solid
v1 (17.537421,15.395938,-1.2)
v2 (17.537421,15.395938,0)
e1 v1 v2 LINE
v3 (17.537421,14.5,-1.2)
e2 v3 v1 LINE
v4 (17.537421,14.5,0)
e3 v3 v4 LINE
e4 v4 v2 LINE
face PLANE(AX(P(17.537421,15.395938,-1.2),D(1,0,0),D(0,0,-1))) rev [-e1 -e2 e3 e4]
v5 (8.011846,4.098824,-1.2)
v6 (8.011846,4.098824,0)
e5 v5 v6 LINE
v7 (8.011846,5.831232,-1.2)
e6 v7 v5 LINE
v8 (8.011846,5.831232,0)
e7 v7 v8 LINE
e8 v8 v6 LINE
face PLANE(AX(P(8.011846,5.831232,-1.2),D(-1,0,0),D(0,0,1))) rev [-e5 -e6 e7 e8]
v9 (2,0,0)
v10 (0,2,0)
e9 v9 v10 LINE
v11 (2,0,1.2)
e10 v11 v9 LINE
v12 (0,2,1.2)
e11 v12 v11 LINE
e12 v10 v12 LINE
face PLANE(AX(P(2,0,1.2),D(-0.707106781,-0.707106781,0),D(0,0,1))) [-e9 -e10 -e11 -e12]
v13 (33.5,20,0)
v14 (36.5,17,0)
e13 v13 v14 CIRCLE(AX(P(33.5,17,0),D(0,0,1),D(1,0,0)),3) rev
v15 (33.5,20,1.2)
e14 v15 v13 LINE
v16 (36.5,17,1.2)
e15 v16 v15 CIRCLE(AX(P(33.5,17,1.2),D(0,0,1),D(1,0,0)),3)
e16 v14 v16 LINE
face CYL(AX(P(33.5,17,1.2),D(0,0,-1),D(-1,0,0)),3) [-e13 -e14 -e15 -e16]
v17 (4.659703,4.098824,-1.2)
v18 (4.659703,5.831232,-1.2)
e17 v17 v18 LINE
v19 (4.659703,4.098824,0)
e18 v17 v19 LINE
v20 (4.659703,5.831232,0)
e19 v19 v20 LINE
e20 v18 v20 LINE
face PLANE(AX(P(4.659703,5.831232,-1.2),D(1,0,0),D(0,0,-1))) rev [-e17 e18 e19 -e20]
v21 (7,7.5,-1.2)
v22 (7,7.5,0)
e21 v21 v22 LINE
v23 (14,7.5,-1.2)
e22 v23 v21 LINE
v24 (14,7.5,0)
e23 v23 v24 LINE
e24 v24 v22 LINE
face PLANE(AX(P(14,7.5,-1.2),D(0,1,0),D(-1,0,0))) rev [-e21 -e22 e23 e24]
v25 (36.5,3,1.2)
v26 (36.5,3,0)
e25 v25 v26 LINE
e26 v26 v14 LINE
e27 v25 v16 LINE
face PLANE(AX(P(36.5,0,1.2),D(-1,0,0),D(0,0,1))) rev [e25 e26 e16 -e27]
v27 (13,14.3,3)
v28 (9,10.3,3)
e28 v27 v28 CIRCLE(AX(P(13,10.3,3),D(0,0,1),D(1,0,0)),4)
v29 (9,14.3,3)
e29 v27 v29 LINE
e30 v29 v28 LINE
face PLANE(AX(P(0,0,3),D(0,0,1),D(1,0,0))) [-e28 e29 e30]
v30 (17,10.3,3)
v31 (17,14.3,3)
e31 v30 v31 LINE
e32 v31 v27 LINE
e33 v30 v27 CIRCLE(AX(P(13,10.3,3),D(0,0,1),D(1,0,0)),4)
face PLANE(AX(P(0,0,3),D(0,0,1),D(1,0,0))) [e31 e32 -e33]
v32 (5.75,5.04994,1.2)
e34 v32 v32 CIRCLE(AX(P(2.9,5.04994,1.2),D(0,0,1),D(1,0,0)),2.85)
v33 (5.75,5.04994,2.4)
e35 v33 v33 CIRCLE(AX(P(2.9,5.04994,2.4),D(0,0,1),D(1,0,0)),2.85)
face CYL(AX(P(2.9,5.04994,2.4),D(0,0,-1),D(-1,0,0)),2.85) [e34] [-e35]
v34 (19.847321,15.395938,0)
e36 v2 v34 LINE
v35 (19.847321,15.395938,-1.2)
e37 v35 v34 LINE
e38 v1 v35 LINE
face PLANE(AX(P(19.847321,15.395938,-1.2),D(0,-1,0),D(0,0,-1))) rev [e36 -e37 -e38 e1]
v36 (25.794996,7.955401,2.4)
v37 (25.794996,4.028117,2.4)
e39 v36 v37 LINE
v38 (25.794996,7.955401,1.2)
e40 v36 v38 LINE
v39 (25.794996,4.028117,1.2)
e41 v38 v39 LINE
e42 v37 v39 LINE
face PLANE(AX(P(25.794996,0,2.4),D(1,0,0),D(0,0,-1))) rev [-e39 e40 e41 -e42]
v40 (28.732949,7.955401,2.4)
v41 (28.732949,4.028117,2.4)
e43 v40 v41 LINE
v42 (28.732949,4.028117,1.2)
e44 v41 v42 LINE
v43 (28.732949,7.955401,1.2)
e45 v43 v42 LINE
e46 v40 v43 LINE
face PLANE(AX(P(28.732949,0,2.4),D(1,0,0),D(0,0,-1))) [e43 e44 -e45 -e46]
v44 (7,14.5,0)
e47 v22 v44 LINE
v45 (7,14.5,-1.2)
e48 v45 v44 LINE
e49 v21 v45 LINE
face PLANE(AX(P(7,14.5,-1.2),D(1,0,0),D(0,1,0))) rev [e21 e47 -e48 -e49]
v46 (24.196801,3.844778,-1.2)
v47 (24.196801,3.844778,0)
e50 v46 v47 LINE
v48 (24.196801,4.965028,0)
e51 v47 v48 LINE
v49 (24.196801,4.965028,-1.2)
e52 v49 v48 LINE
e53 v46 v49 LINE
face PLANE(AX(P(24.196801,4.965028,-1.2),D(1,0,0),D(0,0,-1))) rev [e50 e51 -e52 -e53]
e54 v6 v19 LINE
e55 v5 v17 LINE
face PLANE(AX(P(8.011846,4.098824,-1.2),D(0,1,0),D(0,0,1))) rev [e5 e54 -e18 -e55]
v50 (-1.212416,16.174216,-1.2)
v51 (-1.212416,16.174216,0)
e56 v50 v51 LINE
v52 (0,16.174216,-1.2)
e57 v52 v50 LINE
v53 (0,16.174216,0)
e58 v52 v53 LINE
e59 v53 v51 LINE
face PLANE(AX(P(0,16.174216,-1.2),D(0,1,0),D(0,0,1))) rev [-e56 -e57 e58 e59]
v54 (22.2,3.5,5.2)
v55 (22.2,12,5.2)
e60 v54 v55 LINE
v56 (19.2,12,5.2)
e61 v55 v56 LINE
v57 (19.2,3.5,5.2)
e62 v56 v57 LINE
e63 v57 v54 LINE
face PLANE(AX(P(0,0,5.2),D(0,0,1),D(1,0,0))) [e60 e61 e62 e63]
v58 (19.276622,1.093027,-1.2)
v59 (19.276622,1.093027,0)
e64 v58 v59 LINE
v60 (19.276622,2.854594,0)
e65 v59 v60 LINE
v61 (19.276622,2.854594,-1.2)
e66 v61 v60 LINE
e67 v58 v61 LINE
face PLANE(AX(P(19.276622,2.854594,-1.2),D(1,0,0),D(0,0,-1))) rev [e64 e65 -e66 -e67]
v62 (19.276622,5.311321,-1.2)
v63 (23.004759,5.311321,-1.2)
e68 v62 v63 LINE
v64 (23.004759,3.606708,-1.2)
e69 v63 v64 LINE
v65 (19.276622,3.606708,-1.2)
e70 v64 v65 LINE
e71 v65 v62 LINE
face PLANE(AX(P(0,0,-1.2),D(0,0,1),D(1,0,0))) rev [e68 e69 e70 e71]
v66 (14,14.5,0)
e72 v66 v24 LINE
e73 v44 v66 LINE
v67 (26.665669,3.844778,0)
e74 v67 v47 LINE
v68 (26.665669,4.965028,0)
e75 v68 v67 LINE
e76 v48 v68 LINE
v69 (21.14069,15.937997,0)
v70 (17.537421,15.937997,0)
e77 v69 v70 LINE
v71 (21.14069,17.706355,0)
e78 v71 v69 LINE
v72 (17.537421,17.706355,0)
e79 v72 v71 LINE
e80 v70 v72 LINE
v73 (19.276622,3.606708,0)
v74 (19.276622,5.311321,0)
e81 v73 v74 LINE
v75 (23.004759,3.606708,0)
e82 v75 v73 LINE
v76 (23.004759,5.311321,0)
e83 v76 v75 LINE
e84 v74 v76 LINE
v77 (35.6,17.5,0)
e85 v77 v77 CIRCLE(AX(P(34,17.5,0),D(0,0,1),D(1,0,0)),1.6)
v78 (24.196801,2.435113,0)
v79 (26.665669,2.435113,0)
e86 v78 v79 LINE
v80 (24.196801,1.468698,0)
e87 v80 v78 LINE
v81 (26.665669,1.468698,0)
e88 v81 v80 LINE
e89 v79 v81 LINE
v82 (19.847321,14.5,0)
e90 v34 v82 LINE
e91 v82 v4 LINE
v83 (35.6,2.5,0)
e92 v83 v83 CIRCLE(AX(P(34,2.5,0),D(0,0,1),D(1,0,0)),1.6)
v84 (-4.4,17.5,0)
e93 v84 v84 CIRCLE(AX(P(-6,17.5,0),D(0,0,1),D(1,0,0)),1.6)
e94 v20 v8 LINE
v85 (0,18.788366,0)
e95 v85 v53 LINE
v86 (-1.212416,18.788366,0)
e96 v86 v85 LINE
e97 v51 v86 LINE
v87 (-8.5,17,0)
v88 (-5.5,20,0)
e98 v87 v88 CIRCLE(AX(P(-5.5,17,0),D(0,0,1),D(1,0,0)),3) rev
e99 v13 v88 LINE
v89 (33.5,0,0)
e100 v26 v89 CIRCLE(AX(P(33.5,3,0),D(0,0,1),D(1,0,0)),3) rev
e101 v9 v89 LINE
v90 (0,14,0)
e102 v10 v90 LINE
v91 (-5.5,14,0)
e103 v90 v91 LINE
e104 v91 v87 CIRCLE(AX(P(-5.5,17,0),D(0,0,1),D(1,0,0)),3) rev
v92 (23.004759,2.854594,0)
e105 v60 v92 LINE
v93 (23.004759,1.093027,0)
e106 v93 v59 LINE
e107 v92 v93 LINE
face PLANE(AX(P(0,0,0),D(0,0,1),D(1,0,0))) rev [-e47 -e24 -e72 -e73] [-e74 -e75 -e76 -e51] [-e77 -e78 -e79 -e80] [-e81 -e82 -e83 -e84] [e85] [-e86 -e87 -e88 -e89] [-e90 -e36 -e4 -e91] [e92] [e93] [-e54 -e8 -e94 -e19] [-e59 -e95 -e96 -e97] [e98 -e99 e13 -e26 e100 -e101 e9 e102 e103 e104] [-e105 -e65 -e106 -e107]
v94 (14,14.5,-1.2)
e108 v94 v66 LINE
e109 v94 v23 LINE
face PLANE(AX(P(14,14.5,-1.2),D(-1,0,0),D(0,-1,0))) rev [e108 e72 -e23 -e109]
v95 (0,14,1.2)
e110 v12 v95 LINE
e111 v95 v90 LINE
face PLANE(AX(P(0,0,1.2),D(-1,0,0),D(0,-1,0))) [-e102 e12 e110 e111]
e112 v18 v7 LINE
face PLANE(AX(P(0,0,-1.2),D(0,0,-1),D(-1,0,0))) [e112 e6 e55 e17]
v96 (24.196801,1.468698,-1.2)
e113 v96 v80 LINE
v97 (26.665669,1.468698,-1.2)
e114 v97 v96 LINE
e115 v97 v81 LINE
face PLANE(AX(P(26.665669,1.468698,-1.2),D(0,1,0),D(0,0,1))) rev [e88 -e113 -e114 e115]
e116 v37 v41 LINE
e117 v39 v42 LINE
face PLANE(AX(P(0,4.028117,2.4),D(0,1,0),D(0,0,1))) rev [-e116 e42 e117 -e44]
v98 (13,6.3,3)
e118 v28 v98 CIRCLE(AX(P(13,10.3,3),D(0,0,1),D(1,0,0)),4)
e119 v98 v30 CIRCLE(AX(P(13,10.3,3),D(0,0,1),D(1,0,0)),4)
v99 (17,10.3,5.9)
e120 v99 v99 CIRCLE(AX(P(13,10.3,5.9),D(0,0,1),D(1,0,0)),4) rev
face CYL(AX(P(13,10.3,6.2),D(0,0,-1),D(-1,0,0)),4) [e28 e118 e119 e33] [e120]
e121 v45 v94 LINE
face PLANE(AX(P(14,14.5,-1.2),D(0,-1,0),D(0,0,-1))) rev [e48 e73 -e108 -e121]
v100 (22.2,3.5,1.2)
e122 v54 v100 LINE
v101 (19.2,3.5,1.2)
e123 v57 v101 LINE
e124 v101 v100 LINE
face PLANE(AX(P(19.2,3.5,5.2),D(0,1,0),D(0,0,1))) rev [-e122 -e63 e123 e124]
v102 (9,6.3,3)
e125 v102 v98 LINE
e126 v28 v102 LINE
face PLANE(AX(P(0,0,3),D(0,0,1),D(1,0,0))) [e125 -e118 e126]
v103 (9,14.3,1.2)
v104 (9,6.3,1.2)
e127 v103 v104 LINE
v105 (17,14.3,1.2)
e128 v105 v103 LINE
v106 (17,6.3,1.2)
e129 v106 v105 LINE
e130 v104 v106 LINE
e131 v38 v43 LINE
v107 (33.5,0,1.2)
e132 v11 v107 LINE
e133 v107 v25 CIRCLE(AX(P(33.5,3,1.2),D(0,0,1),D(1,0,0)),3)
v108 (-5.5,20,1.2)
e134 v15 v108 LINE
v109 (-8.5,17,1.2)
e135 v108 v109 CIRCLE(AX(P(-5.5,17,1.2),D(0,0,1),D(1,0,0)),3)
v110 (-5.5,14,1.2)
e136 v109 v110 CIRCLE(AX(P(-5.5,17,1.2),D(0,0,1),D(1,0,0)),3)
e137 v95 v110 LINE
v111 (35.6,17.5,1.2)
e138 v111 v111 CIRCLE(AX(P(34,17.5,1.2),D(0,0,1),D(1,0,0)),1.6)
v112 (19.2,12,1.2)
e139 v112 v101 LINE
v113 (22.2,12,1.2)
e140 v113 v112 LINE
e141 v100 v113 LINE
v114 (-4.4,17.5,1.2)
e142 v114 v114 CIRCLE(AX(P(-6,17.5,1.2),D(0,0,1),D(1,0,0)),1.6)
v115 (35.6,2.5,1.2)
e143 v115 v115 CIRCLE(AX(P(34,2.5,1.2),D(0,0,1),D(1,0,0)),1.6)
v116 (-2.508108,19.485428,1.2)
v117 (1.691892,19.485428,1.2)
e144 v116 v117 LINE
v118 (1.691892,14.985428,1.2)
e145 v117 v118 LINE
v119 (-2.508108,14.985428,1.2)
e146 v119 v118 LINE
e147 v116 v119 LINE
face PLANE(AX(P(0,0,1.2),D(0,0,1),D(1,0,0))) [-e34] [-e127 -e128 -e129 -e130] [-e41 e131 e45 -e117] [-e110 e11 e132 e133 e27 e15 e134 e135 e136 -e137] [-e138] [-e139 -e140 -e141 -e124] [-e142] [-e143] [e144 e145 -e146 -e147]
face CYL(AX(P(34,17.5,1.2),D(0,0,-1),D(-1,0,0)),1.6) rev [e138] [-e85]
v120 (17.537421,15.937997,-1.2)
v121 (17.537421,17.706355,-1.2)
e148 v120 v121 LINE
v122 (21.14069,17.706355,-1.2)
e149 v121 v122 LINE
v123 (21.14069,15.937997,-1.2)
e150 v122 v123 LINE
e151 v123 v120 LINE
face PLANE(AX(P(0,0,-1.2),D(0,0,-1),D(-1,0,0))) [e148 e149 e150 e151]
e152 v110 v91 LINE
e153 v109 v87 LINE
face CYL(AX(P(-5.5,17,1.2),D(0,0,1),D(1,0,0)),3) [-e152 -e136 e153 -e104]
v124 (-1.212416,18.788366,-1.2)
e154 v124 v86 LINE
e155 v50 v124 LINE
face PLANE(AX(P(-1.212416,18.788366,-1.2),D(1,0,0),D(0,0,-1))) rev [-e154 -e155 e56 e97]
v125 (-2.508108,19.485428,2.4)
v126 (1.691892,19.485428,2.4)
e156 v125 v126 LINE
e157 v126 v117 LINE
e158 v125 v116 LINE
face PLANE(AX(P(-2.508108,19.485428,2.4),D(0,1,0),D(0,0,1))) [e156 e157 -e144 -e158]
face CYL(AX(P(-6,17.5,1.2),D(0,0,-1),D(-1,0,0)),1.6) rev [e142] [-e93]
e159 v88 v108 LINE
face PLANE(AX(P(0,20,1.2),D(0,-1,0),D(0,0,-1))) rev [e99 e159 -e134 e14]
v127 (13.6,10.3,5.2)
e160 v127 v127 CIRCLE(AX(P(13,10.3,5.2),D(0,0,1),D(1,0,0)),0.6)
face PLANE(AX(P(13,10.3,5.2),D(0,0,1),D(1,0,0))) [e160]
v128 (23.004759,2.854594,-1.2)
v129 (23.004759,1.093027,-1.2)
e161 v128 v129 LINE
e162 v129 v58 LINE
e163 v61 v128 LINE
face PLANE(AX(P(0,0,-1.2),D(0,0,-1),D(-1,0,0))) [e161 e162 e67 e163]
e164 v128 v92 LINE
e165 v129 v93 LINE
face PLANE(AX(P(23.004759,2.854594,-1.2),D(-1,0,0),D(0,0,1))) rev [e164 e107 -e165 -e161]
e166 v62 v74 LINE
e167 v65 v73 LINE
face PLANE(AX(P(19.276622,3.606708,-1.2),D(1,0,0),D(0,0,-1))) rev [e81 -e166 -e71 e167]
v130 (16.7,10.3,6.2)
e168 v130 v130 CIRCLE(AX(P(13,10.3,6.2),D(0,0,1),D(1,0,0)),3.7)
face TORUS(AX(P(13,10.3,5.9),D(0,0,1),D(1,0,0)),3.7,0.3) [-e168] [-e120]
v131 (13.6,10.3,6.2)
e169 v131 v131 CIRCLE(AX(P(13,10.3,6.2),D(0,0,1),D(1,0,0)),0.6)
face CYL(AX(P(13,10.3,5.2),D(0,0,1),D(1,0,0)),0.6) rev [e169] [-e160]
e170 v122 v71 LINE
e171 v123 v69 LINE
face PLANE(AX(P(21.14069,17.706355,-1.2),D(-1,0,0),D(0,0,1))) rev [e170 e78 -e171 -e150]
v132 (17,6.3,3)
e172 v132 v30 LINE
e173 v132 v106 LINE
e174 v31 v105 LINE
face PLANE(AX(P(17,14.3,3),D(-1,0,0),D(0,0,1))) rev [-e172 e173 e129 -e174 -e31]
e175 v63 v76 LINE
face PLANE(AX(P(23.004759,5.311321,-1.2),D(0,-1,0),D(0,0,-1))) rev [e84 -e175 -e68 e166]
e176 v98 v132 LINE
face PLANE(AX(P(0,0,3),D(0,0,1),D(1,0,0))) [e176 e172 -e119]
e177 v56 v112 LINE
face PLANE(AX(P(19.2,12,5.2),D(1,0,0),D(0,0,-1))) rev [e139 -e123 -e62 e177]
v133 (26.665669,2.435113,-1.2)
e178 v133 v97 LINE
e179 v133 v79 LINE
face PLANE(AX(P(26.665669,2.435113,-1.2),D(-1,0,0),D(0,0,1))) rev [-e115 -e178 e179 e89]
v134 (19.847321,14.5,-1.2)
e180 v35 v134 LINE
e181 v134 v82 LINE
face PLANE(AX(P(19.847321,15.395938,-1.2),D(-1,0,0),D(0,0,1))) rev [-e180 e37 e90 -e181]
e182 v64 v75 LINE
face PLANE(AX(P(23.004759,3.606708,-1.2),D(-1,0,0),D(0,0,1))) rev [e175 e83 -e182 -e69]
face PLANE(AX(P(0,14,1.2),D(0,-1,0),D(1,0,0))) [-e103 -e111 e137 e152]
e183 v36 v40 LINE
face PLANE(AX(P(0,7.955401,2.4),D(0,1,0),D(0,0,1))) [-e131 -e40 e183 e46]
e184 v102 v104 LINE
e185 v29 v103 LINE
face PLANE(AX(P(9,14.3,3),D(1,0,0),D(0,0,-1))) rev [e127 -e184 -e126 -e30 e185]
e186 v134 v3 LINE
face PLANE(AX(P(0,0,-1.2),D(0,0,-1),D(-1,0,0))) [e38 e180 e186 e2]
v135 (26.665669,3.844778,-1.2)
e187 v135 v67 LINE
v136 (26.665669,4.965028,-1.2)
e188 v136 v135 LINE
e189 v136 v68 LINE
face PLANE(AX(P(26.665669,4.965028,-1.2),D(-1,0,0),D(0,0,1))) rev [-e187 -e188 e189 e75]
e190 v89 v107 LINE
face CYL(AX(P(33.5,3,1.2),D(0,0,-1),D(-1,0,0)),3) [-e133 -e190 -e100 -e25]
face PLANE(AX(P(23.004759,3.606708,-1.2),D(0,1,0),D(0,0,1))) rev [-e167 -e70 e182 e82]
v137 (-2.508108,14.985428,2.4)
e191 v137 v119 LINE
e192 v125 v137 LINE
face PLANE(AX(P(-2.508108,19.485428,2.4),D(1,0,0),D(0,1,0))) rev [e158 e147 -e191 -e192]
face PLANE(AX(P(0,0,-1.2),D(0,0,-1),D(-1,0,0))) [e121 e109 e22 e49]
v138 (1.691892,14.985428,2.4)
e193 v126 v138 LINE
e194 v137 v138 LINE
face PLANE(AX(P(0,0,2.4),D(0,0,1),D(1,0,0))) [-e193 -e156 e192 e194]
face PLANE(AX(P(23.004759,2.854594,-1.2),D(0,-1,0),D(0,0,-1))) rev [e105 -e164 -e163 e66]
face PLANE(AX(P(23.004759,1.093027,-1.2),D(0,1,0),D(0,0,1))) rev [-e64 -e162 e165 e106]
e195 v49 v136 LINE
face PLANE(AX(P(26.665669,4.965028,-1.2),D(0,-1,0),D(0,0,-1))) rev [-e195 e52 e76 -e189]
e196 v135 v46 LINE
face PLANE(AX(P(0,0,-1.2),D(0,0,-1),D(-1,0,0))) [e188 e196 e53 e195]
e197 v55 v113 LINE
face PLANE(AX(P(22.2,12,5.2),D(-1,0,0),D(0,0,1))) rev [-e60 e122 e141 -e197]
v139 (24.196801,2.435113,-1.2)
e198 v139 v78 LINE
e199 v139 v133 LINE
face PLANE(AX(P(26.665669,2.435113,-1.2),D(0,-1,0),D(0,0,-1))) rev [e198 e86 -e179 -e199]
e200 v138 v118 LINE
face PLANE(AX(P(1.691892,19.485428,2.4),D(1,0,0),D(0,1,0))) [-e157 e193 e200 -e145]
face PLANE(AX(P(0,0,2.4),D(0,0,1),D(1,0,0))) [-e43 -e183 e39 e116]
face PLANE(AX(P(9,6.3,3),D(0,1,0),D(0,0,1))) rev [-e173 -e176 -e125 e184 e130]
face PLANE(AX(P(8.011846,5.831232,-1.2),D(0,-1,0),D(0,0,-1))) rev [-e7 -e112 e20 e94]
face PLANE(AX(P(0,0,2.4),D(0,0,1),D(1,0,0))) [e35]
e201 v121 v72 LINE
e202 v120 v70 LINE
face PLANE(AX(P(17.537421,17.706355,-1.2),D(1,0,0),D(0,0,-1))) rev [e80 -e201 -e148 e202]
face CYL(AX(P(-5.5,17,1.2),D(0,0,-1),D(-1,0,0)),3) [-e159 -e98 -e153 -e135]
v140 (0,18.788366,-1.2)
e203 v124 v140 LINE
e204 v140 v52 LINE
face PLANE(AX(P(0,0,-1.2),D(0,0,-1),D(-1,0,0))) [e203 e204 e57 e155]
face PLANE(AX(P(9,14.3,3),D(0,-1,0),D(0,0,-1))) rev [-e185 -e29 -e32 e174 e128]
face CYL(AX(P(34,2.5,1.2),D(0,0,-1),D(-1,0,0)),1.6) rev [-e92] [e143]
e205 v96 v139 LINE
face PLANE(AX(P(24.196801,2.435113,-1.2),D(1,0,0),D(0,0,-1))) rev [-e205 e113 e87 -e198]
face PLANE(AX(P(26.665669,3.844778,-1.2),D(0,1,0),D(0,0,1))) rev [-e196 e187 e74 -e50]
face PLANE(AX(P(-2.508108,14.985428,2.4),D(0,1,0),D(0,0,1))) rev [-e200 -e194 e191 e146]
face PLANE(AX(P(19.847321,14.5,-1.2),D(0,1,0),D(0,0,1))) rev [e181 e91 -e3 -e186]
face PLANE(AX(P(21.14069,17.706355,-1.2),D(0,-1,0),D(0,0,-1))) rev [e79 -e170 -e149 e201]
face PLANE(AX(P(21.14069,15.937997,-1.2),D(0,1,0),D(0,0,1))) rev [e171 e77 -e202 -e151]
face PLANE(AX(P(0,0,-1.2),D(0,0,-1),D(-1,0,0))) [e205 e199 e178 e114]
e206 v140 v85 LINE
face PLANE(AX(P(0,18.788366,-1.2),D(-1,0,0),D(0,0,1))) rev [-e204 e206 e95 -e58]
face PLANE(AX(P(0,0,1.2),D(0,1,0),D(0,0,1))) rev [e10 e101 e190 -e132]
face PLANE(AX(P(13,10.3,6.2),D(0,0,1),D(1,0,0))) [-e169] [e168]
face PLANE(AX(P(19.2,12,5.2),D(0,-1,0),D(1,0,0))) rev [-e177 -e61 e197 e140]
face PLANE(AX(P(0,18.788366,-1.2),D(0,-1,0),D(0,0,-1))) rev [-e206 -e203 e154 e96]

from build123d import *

# Parameters (mm, degrees)
SKETCH1_R           = 1.6
BOSS_EXTRUDE1_DEPTH = 1.2
SKETCH2_R           = 2.85
SKETCH2_W           = 2.937952631
SKETCH2_H           = 3.927283648
SKETCH2_W_2         = 4.2
SKETCH2_H_2         = 4.5
BOSS_EXTRUDE2_DEPTH = 1.2
SKETCH3_W           = 8
SKETCH3_H           = 8
BOSS_EXTRUDE3_DEPTH = 1.8
SKETCH4_R           = 4
BOSS_EXTRUDE4_DEPTH = 3.2
SKETCH5_R           = 0.6
CUT_EXTRUDE1_DEPTH  = 1
SKETCH7_W           = 7
SKETCH7_H           = 7
SKETCH7_W_2         = 3.728136851
SKETCH7_H_2         = 1.761566417
SKETCH7_H_3         = 1.704612402
SKETCH7_W_3         = 3.603269321
SKETCH7_H_4         = 1.768357774
SKETCH7_W_4         = 3.352143609
SKETCH7_H_5         = 1.732407439
SKETCH7_W_5         = 1.212415991
SKETCH7_H_6         = 2.614149225
SKETCH7_W_6         = 2.309899449
SKETCH7_H_7         = 0.895937988
SKETCH7_W_7         = 2.468868555
SKETCH7_H_8         = 1.120250043
SKETCH7_H_9         = 0.966414447
BOSS_EXTRUDE5_DEPTH = 1.2
SKETCH8_W           = 3
SKETCH8_H           = 8.5
BOSS_EXTRUDE6_DEPTH = 4
FILLET1_R           = 0.3
FILLET2_R           = 3
CHAMFER1_SIZE       = 2


with BuildPart() as part:
    # Sketch1 → Boss-Extrude1 (new body)
    with BuildSketch(Plane.XY):
        Polygon((0, 20), (-8.5, 20), (-8.5, 14), (0, 14), (0, 0), (36.5, 0), (36.5, 20), align=None)
        with Locations((-6, 17.5)):
            Circle(SKETCH1_R, mode=Mode.SUBTRACT)
        with Locations((34, 2.5)):
            Circle(SKETCH1_R, mode=Mode.SUBTRACT)
        with Locations((34, 17.5)):
            Circle(SKETCH1_R, mode=Mode.SUBTRACT)
    extrude(amount=BOSS_EXTRUDE1_DEPTH)

    # Sketch2 → Boss-Extrude2 (add)
    with BuildSketch(Plane.XY.offset(1.2)):
        with Locations((2.9, 5.049940133)):
            Circle(SKETCH2_R)
        with Locations((27.263972555, 5.991759132)):
            Rectangle(SKETCH2_W, SKETCH2_H)
        with Locations((-0.408107806, 17.235427956)):
            Rectangle(SKETCH2_W_2, SKETCH2_H_2)
    extrude(amount=BOSS_EXTRUDE2_DEPTH)

    # Sketch3 → Boss-Extrude3 (add)
    with BuildSketch(Plane.XY.offset(1.2)):
        with Locations((13, 10.3)):
            Rectangle(SKETCH3_W, SKETCH3_H)
    extrude(amount=BOSS_EXTRUDE3_DEPTH)

    # Sketch4 → Boss-Extrude4 (add)
    with BuildSketch(Plane.XY.offset(3)):
        with Locations((13, 10.3)):
            Circle(SKETCH4_R)
    extrude(amount=BOSS_EXTRUDE4_DEPTH)

    # Sketch5 → Cut-Extrude1 (cut)
    with BuildSketch(Plane.XY.offset(6.2)):
        with Locations((13, 10.3)):
            Circle(SKETCH5_R)
    extrude(amount=-CUT_EXTRUDE1_DEPTH, mode=Mode.SUBTRACT)

    # Sketch7 → Boss-Extrude5 (add)
    with BuildSketch(Plane(origin=(0, 0, 0), x_dir=(-1, 0, 0), z_dir=(0, 0, -1))):
        with Locations((-10.5, 11)):
            Rectangle(SKETCH7_W, SKETCH7_H)
        with Locations((-21.140690462, 1.973810546)):
            Rectangle(SKETCH7_W_2, SKETCH7_H_2)
        with Locations((-21.140690462, 4.459014526)):
            Rectangle(SKETCH7_W_2, SKETCH7_H_3)
        with Locations((-19.339055802, 16.82217617)):
            Rectangle(SKETCH7_W_3, SKETCH7_H_4)
        with Locations((-6.335774559, 4.965027996)):
            Rectangle(SKETCH7_W_4, SKETCH7_H_5)
        with Locations((0.606207996, 17.481290904)):
            Rectangle(SKETCH7_W_5, SKETCH7_H_6)
        with Locations((-18.692370866, 14.947968994)):
            Rectangle(SKETCH7_W_6, SKETCH7_H_7)
        with Locations((-25.431234808, 4.404902976)):
            Rectangle(SKETCH7_W_7, SKETCH7_H_8)
        with Locations((-25.431234808, 1.951905582)):
            Rectangle(SKETCH7_W_7, SKETCH7_H_9)
    extrude(amount=BOSS_EXTRUDE5_DEPTH)

    # Sketch8 → Boss-Extrude6 (add)
    with BuildSketch(Plane.XY.offset(1.2)):
        with Locations((20.7, 7.75)):
            Rectangle(SKETCH8_W, SKETCH8_H)
    extrude(amount=BOSS_EXTRUDE6_DEPTH)

    # Fillet1
    fillet1_edges = [part.edges().sort_by_distance(p)[0] for p in [
        (9, 10.3, 6.2),
    ]]
    fillet(fillet1_edges, radius=FILLET1_R)

    # Fillet2
    fillet2_edges = [part.edges().sort_by_distance(p)[0] for p in [
        (36.5, 20, 0.6),
        (36.5, 0, 0.6),
        (-8.5, 14, 0.6),
        (-8.5, 20, 0.6),
    ]]
    fillet(fillet2_edges, radius=FILLET2_R - 0.0001)  # a hair under: the kernel refuses the full size

    # Chamfer1
    chamfer1_edges = [part.edges().sort_by_distance(p)[0] for p in [
        (0, 0, 0.6),
    ]]
    chamfer(chamfer1_edges, length=CHAMFER1_SIZE)


solid = part.part
